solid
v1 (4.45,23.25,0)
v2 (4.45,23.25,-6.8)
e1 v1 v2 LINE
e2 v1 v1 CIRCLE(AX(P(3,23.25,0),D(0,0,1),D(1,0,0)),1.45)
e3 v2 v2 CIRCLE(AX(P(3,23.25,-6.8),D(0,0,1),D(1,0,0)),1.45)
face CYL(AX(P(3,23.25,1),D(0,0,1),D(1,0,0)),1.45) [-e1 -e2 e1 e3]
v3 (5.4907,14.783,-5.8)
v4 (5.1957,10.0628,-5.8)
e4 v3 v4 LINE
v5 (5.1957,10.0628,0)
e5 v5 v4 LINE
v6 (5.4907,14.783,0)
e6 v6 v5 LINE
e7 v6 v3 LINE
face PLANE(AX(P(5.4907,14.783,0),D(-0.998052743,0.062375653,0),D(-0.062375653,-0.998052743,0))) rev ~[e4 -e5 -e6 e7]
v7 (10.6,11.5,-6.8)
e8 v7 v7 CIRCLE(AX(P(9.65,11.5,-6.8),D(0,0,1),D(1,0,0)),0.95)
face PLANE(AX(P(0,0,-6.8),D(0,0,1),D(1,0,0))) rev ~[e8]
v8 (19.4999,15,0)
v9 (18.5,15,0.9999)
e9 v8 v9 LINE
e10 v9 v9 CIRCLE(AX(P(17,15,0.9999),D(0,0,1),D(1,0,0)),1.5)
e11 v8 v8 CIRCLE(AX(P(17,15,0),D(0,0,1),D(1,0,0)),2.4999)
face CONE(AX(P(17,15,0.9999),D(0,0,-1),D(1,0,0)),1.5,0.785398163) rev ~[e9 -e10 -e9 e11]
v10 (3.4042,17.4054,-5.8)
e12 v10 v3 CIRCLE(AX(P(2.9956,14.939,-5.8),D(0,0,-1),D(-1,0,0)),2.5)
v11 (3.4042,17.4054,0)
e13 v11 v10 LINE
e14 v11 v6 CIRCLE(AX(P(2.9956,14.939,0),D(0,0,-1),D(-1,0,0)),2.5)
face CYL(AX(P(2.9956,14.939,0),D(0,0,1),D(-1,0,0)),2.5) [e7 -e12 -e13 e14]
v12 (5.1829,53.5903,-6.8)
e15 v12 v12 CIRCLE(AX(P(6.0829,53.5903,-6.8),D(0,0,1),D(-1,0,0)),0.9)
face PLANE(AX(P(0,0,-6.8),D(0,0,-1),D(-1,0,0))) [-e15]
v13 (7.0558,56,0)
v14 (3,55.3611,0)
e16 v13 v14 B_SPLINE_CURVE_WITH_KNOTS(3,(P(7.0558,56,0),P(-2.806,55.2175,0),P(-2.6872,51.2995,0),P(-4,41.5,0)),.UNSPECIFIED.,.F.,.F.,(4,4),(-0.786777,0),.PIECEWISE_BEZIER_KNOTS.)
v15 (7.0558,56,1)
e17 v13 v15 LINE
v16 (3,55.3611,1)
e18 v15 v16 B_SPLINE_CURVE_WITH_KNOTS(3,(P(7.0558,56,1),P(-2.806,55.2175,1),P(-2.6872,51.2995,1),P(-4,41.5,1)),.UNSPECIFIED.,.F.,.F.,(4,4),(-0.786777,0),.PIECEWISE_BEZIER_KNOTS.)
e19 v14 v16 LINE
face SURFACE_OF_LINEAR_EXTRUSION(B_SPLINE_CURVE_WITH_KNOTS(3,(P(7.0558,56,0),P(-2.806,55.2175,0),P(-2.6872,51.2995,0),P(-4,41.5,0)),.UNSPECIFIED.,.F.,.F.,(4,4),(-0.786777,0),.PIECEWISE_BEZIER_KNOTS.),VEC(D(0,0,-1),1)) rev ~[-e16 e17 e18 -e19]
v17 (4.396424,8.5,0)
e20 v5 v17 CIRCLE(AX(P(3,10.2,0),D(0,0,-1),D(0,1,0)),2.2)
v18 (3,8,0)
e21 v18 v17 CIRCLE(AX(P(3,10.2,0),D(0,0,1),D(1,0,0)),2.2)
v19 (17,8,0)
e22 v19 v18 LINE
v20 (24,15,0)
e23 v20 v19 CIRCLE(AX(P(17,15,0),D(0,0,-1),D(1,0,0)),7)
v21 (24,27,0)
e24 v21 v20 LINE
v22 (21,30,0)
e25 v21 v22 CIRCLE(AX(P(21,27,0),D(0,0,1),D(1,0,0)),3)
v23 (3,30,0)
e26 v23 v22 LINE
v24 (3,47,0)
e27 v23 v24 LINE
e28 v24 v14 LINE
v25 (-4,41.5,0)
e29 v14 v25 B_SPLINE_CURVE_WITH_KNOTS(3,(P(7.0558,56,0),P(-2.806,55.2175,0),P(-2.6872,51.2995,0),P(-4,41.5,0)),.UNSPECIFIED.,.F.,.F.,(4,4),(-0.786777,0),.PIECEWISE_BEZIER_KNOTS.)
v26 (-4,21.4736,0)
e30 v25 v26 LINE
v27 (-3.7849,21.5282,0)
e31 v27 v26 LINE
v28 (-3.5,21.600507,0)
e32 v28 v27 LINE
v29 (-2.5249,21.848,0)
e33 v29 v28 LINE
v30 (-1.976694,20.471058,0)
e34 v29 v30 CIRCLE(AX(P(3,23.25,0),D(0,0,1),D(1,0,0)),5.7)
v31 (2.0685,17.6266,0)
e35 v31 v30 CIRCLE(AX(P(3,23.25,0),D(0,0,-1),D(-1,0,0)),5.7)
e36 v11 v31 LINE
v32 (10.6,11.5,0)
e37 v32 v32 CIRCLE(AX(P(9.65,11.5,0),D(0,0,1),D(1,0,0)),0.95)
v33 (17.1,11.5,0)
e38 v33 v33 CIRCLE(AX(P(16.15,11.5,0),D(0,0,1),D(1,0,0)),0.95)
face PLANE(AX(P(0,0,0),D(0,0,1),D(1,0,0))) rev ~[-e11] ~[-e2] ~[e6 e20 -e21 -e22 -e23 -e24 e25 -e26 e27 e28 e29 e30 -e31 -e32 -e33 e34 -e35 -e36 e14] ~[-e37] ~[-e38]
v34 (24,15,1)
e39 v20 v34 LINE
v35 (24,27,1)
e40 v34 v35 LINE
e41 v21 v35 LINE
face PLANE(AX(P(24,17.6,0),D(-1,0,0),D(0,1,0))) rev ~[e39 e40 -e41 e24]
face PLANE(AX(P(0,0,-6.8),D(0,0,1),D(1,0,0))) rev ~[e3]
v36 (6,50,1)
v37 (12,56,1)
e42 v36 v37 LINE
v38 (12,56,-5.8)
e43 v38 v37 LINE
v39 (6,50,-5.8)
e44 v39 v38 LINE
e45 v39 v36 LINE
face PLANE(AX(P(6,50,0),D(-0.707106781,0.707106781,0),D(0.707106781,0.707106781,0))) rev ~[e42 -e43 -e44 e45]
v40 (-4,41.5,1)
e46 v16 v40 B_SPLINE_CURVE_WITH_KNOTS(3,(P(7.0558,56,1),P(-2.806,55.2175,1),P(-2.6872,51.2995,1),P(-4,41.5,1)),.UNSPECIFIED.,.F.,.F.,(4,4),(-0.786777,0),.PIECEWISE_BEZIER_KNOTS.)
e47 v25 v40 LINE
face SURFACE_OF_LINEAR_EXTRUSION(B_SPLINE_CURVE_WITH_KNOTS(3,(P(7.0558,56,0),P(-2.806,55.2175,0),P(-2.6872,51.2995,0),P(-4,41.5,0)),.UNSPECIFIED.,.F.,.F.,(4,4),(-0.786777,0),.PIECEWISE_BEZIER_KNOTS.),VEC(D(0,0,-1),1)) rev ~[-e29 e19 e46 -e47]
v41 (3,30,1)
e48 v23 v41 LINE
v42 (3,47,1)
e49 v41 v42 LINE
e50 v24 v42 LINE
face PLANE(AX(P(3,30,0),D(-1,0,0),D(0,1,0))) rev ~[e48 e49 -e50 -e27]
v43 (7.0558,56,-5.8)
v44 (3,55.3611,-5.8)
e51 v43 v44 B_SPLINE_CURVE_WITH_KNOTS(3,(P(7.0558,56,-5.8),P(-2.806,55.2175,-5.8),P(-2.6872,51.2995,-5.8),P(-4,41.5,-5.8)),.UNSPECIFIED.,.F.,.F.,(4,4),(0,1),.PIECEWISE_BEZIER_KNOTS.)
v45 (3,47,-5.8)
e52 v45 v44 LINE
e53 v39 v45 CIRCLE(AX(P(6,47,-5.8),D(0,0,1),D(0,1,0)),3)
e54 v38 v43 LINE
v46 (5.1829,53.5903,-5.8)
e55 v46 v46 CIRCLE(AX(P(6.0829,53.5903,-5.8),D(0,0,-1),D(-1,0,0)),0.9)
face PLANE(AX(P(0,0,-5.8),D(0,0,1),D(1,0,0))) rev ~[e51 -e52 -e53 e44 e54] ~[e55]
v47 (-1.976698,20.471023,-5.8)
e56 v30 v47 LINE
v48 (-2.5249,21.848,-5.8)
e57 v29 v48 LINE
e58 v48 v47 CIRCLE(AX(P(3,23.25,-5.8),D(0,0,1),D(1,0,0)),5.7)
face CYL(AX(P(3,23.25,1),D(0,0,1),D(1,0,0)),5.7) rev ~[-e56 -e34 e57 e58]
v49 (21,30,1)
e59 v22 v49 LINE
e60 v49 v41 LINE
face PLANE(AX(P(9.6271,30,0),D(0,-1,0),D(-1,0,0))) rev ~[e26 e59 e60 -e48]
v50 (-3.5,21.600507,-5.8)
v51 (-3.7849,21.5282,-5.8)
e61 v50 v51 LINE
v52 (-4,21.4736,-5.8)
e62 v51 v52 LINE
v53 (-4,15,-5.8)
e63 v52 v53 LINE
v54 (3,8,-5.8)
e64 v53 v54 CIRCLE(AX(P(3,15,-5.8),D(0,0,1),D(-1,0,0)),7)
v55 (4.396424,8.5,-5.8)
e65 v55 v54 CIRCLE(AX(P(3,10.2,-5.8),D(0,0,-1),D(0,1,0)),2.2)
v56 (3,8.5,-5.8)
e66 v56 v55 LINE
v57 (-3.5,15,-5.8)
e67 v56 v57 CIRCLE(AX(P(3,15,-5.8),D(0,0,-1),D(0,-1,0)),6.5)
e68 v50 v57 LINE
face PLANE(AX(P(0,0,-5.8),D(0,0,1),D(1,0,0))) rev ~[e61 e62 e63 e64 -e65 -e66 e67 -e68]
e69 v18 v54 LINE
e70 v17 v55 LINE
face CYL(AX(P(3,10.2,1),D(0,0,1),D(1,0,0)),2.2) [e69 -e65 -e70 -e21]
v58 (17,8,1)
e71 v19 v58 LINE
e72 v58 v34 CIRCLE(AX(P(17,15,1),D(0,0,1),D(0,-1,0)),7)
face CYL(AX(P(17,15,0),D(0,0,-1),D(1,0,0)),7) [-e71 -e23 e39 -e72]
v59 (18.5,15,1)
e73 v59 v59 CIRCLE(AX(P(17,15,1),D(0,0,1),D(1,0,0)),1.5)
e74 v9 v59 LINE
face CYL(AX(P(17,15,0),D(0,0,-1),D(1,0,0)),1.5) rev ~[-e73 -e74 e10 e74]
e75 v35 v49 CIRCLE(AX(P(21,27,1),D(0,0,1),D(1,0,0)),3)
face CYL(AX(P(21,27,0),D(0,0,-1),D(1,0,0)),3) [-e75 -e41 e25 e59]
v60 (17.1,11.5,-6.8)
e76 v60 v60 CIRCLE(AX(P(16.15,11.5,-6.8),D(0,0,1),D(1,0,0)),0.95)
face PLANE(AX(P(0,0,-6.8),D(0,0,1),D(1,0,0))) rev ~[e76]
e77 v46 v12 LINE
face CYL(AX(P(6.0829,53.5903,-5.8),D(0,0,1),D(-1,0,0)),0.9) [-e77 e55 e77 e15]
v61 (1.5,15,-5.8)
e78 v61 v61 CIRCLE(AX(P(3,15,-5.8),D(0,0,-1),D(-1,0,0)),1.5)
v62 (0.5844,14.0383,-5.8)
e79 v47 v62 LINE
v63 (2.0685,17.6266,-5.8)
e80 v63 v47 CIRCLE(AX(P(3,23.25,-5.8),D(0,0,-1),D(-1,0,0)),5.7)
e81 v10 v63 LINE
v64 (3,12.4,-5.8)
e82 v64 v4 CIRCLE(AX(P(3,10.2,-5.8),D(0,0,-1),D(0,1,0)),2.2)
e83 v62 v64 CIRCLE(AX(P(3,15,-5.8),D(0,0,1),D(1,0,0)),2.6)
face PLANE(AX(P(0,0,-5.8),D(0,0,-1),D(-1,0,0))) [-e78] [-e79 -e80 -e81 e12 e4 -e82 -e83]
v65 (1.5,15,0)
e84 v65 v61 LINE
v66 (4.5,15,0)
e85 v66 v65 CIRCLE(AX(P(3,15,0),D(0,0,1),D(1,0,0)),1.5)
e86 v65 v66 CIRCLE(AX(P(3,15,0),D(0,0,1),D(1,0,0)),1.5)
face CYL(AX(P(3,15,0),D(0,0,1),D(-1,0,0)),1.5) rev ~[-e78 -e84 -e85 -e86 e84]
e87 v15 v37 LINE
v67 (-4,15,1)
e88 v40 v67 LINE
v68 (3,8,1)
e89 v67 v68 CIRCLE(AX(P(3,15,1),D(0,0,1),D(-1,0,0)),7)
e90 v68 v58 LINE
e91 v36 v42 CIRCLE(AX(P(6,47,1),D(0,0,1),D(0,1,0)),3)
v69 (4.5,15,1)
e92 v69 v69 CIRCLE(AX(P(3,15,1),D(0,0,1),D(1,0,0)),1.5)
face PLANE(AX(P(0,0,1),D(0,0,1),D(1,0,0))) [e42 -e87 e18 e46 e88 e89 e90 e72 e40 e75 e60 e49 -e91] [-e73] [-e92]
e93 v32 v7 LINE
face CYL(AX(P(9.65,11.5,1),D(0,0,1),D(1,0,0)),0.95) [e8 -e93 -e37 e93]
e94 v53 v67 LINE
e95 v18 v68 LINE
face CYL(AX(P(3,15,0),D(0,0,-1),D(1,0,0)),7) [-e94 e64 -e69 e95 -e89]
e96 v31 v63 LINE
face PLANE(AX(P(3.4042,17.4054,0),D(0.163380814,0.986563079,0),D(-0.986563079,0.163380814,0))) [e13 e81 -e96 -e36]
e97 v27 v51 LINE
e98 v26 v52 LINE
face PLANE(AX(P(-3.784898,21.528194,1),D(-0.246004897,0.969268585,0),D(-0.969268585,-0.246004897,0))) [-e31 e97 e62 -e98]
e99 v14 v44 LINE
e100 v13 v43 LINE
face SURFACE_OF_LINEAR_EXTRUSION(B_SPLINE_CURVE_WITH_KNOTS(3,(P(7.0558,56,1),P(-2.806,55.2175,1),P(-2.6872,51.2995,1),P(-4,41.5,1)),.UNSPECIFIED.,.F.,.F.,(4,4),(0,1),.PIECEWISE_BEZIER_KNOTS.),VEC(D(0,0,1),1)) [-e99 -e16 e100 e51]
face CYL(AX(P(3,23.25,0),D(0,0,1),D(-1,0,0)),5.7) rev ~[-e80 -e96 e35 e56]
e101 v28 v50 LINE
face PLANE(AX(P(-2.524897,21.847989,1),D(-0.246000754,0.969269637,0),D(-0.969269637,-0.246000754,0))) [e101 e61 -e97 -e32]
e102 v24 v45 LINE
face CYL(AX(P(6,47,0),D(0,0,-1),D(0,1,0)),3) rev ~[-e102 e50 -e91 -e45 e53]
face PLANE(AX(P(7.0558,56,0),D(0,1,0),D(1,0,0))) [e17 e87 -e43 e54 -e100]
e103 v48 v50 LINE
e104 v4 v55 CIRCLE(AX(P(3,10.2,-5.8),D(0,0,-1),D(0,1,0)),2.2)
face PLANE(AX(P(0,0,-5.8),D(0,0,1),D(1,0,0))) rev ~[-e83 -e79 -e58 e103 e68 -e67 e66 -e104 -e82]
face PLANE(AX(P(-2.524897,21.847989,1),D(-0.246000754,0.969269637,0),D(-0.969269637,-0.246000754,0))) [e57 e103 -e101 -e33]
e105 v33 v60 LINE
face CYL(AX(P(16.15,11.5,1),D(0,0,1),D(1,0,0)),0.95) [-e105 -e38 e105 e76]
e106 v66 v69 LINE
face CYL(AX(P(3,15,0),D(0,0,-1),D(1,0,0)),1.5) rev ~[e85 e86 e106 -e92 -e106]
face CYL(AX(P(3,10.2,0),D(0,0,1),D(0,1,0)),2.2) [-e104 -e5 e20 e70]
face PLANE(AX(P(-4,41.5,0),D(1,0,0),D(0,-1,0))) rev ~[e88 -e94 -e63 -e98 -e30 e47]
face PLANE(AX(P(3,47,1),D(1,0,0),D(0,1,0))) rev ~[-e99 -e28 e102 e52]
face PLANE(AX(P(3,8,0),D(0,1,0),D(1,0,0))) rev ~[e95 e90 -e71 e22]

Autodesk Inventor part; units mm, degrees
ref_plane "YZ Plane" through (0, 0, 0) normal (1, 0, 0) x (0, 1, 0)
sketch "Эскиз1" plane through (0, 0, 0) normal (0, 0, 1) x (1, 0, 0)
  line L0 (177.53, 10) -> (177.53, -9.022) projected
  line L1 (177.53, -9.022) -> (165.53, -9.022) projected
  line L2 (165.53, -9.022) -> (165.53, 10) projected
  line L3 (165.53, 10) -> (177.53, 10) projected
  line L4 (165.53, -76) -> (165.53, -56.978) projected
  line L5 (165.53, -56.978) -> (177.53, -56.978) projected
  line L6 (177.53, -56.978) -> (177.53, -76) projected
  line L7 (177.53, -76) -> (165.53, -76) projected
  circle A0 centre (170.53, -49.23) radius 1.6 projected
  circle A1 centre (170.53, -16.77) radius 1.6 projected
  line L8 (181.53, -107.5) -> (181.53, 41.5) projected
  spline S0 degree 3 poles (170.4742, 56) (180.336, 55.2175) (180.2172, 51.2995) (181.53, 41.5) knots -0.786777 -0.786777 -0.786777 -0.786777 0 0 0 0 projected
  line L9 (7.0558, 56) -> (170.4742, 56) projected
  spline S1 degree 3 poles (7.0558, 56) (-2.806, 55.2175) (-2.6872, 51.2995) (-4, 41.5) knots -0.786777 -0.786777 -0.786777 -0.786777 0 0 0 0 projected
  line L10 (-4, 41.5) -> (-4, -107.5) projected
  spline S2 degree 3 poles (7.0558, -122) (-2.806, -121.2175) (-2.6872, -117.2995) (-4, -107.5) knots -0.786777 -0.786777 -0.786777 -0.786777 0 0 0 0 projected
  line L11 (170.4742, -122) -> (7.0558, -122) projected
  spline S3 degree 3 poles (170.4742, -122) (180.336, -121.2175) (180.2172, -117.2995) (181.53, -107.5) knots -0.786777 -0.786777 -0.786777 -0.786777 0 0 0 0 projected
  arc A2 (153.53, -93) -> (156.53, -96) centre (156.53, -93) ccw projected
  line L12 (156.53, -96) -> (174.53, -96) projected
  line L13 (174.53, -96) -> (174.53, -113) projected
  arc A3 (171.53, -116) -> (174.53, -113) centre (171.53, -113) ccw projected
  line L14 (171.53, -116) -> (6, -116) projected
  arc A4 (3, -113) -> (6, -116) centre (6, -113) ccw projected
  line L15 (3, -113) -> (3, -96) projected
  line L16 (3, -96) -> (21, -96) projected
  arc A5 (21, -96) -> (24, -93) centre (21, -93) ccw projected
  line L17 (24, -93) -> (24, 27) projected
  arc A6 (24, 27) -> (21, 30) centre (21, 27) ccw projected
  line L18 (21, 30) -> (3, 30) projected
  line L19 (3, 30) -> (3, 47) projected
  arc A7 (6, 50) -> (3, 47) centre (6, 47) ccw projected
  line L20 (6, 50) -> (171.53, 50) projected
  arc A8 (174.53, 47) -> (171.53, 50) centre (171.53, 47) ccw projected
  line L21 (174.53, 30) -> (174.53, 47) projected
  line L22 (174.53, 30) -> (156.53, 30) projected
  arc A9 (156.53, 30) -> (153.53, 27) centre (156.53, 27) ccw projected
  line L23 (153.53, 27) -> (153.53, -93) projected
  circle A10 centre (160.53, -81) radius 1.5 projected
  circle A11 centre (17, -81) radius 1.5 projected
  circle A12 centre (17, -51) radius 1.5 projected
  circle A13 centre (160.53, -51) radius 1.5 projected
  circle A14 centre (3, -81) radius 1.5 projected
  circle A15 centre (3, -51) radius 1.5 projected
  circle A16 centre (174.53, -81) radius 1.5 projected
  circle A17 centre (17, 15) radius 1.5 projected
  circle A18 centre (17, -15) radius 1.5 projected
  circle A19 centre (160.53, -15) radius 1.5 projected
  circle A20 centre (160.53, 15) radius 1.5 projected
  circle A21 centre (3, 15) radius 1.5 projected
  circle A22 centre (174.53, 15) radius 1.5 projected
  circle A23 centre (3, -15) radius 1.5 projected
  arc A24 (56.8183, -29.5099) -> (58.485, -27.5378) centre (56.485, -27.5378) ccw projected
  line L24 (58.485, -27.5378) -> (58.485, 14) projected
  arc A25 (61.485, 17) -> (58.485, 14) centre (61.485, 14) ccw projected
  line L25 (61.485, 17) -> (61.97, 17) projected
  arc A26 (61.97, 17) -> (64.97, 20) centre (61.97, 20) ccw projected
  line L26 (64.97, 27) -> (64.97, 20) projected
  arc A27 (64.97, 27) -> (61.97, 30) centre (61.97, 27) ccw projected
  line L27 (9.6271, 30) -> (61.97, 30) projected
  arc A28 (9.6271, 30) -> (-1.03, 20.7602) centre (9.8286, 19.0018) ccw projected
  line L28 (-1.03, 20.7602) -> (-1.03, 11.499) projected
  arc A29 (-1.03, 11.499) -> (0.1129, 8.6996) centre (2.97, 11.499) ccw projected
  arc A30 (0.97, 6.6) -> (0.1129, 8.6996) centre (-2.03, 6.6) ccw projected
  line L29 (0.97, 6.6) -> (0.97, -72.6) projected
  arc A31 (0.1129, -74.6996) -> (0.97, -72.6) centre (-2.03, -72.6) ccw projected
  arc A32 (0.1129, -74.6996) -> (-1.03, -77.499) centre (2.97, -77.499) ccw projected
  line L30 (-1.03, -77.499) -> (-1.03, -86.7602) projected
  arc A33 (-1.03, -86.7602) -> (9.6271, -96) centre (9.8286, -85.0018) ccw projected
  line L31 (61.97, -96) -> (9.6271, -96) projected
  arc A34 (61.97, -96) -> (64.97, -93) centre (61.97, -93) ccw projected
  line L32 (64.97, -86) -> (64.97, -93) projected
  arc A35 (64.97, -86) -> (61.97, -83) centre (61.97, -86) ccw projected
  line L33 (61.97, -83) -> (61.485, -83) projected
  arc A36 (58.485, -80) -> (61.485, -83) centre (61.485, -80) ccw projected
  line L34 (58.485, -80) -> (58.485, -48.5022) projected
  arc A37 (58.485, -48.5022) -> (56.8183, -46.5301) centre (56.485, -48.5022) ccw projected
  arc A38 (53.485, -45.3303) -> (56.8183, -46.5301) centre (58.485, -36.67) ccw projected
  arc A39 (52.485, -43.5982) -> (53.485, -45.3303) centre (54.485, -43.5982) ccw projected
  line L35 (52.485, -43.5982) -> (52.485, -32.4418) projected
  arc A40 (53.485, -30.7097) -> (52.485, -32.4418) centre (54.485, -32.4418) ccw projected
  arc A41 (56.8183, -29.5099) -> (53.485, -30.7097) centre (58.485, -39.37) ccw projected
  circle A42 centre (3, -81) radius 1.5 projected
  circle A43 centre (3, 15) radius 1.5 projected
  circle A44 centre (58.485, -89.515) radius 1.5 projected
  circle A45 centre (17, -51) radius 1.5 projected
  circle A46 centre (17, -15) radius 1.5 projected
  circle A47 centre (58.485, 23.515) radius 1.5 projected
  circle A48 centre (49.485, 22.73) radius 0.325 projected
  circle A49 centre (48.885, -25.77) radius 0.8 projected
  circle A50 centre (49.385, -32.52) radius 0.5 projected
  circle A51 centre (4.27, -36.27) radius 0.325 projected
  circle A52 centre (28.2, -73.38) radius 0.325 projected
  circle A53 centre (12.77, 15) radius 0.325 projected
  circle A54 centre (55.185, -49.79) radius 0.325 projected
  circle A55 centre (55.185, -4.51) radius 0.325 projected
  circle A56 centre (12.77, 22) radius 0.325 projected
  circle A57 centre (12.77, -88) radius 0.325 projected
  circle A58 centre (4.27, -23.42) radius 0.325 projected
  circle A59 centre (39.385, -40.52) radius 0.85 projected
  circle A60 centre (53.885, -25.77) radius 0.8 projected
  circle A61 centre (8.77, -88) radius 0.325 projected
  circle A62 centre (39.385, -35.52) radius 0.85 projected
  circle A63 centre (28.2, -60.76) radius 0.325 projected
  circle A64 centre (4.27, -47) radius 0.325 projected
  circle A65 centre (45.215, -90) radius 0.325 projected
  circle A66 centre (43.485, 24.73) radius 0.5 projected
  circle A67 centre (55.185, -69.03) radius 0.325 projected
  circle A68 centre (55.185, 15.73) radius 0.325 projected
  circle A69 centre (45.215, -83) radius 0.325 projected
  circle A70 centre (12.77, -81) radius 0.325 projected
  circle A71 centre (4.27, -8.84) radius 0.325 projected
  circle A72 centre (49.385, -43.52) radius 0.5 projected
  circle A73 centre (8.77, 22) radius 0.325 projected
  line L36 (6, 50) -> (12, 56)
  line L37 (3, 47) -> (3, 55.3611)
  circle A74 centre (3, 15) radius 7
  circle A75 centre (17, 15) radius 7
  line L38 (3, 8) -> (17, 8)
  circle A76 centre (3, 15) radius 2.6
  line L39 (3, 17.6) -> (24, 17.6)
  line L40 (5.6, 15) -> (7.6, 15)
  line L41 (7.6, 15) -> (7.6, 17.6)
  line L42 (7.6, 15) -> (7.6, 8)
  line L43 (7.6, 17.6) -> (20.4, 17.6)
  line L44 (20.4, 17.6) -> (20.4, 7.6)
  line L45 (20.4, 7.6) -> (7.6, 7.6)
  line L46 (7.6, 7.6) -> (7.6, 17.6)
  point P0 (0, 0)
  point P1 (23.4992, 17.6)
  point P2 (-4, 15)
  point P3 (10.5008, 17.6)
  point P4 (10, 15)
  point P5 (9.4992, 17.6)
  point P6 (24, 15)
  dimension "d8" = 5.2
  dimension "d15" = 2
  dimension "d16" = 12.8
  dimension "d17" = 10
extrude "Выдавливание1" add sketch "Эскиз1" along normal blind 1 contours L36 A7 L37 S1 L9 | L10 S1 L37 L19 L18 A28 L28 A74 | A74 L28 A29 A30 | A74 L39 A76 L40 L42 A30 A29 L28 | L28 A28 L18 A6 L17 L39 A75 A74 | L39 A75 A74 | A74 L42 L41 L39 | A74 L42 L38 | A75 L38 L42 A74 | A75 L39 L44 | L41 L40 A76 L39 | A75 L39 | A76 | L39 L17 A75 | A75 L44 L39 | A53 | A56 | A73
chamfer "Фаска1" distance 1 angle 45 1 edges at (15.5, 15, 0)
sketch "Эскиз2" plane through (0, 0, 1) normal (0, 0, 1) x (1, 0, 0)
  circle A0 centre (3, 15) radius 1.5 projected
  line L0 (24, 15) -> (24, 27) projected
  arc A1 (24, 27) -> (21, 30) centre (21, 27) ccw projected
  line L1 (21, 30) -> (3, 30) projected
  line L2 (3, 30) -> (3, 47) projected
  arc A2 (6, 50) -> (3, 47) centre (6, 47) ccw projected
  line L3 (6, 50) -> (12, 56) projected
  line L4 (12, 56) -> (7.0558, 56) projected
  line L5 (-4, 41.5) -> (-4, 15) projected
  arc A3 (-4, 15) -> (3, 8) centre (3, 15) ccw projected
  line L6 (3, 8) -> (17, 8) projected
  arc A4 (17, 8) -> (24, 15) centre (17, 15) ccw projected
  line L7 (3, 30) -> (3, 47) projected
  line L8 (3, 47) -> (3, 55.3611)
  arc A5 (6, 50) -> (3, 47) centre (6, 47) ccw projected
  circle A6 centre (3, 15) radius 1.5 projected
  line L9 (4.5, 15) -> (6.5, 15)
  line L10 (6.5, 15) -> (6.5, 16.5)
  line L11 (6.5, 16.5) -> (3, 16.5)
  line L12 (21, 30) -> (3, 30) projected
  line L13 (3, 16.5) -> (3, 30)
  circle A7 centre (3, 23.25) radius 1.6
  line L14 (6.5, 16.5) -> (19.3, 16.5)
  line L15 (19.3, 16.5) -> (19.3, 6.4)
  line L16 (19.3, 6.4) -> (6.5, 6.4)
  line L17 (6.5, 6.4) -> (6.5, 16.5)
  line L18 (19.3, 16.5) -> (19.3, 10)
  line L19 (19.3, 10) -> (19.3, 11.5)
  line L20 (19.3, 11.5) -> (6.5, 11.5)
  line L21 (12.9, 11.5) -> (16.15, 11.5)
  line L22 (16.15, 11.5) -> (9.65, 11.5)
  circle A8 centre (9.65, 11.5) radius 1
  circle A9 centre (16.15, 11.5) radius 1
  line L23 (19.3, 10) -> (6.5, 10)
  line L24 (9.65, 11.5) -> (18.15, 11.5)
  line L25 (18.172, 17.2) -> (6.5, 16.5)
  line L26 (17.4875, 20.5) -> (6.5, 16.5)
  arc A10 (18.1929, 16.5) -> (17.4875, 20.5) centre (6.5, 16.5) ccw
  line L27 (6.5, 16.5) -> (6.5, 16.7)
  line L28 (8.0036, 17.7621) -> (19.1448, 21.3116)
  circle A11 centre (3, 15) radius 2.6
  circle A12 centre (3, 23.25) radius 5.5
  line L29 (8.0036, 17.7621) -> (5.1102, 17.8522)
  line L30 (2.8349, 17.7525) -> (3.7176, 17.499)
  circle A13 centre (3, 23.25) radius 16.2607
  line L31 (6.5, 16.7) -> (18.172, 17.4)
  line L32 (6.5, 16.7) -> (3.7176, 17.499)
  line L33 (4.1923, 17.8808) -> (5.1102, 17.8522)
  line L34 (17.7935, 30) -> (3, 23.25)
  line L35 (3, 23.25) -> (18.9993, 26.1538)
  line L36 (21, 30) -> (3, 30) projected
  line L37 (18.9993, 26.1538) -> (8.3735, 28.8503)
  line L38 (18.9993, 26.1538) -> (3.8431, 30)
  circle A14 centre (3, 23.25) radius 6.75
  point P0 (0, 0)
  dimension "d41" = 11
  dimension "d23" = 2
  dimension "d24" = 3.2
  dimension "d25" = 12.8
  dimension "d26" = 10.1
  dimension "d27" = 6.5
  dimension "d28" = 1.5
  dimension "d29" = 3.25
  dimension "d30" = 6.5
  dimension "d31" = 2
  dimension "d32" = 2
  dimension "d35" = 8.5
  dimension "d39" = 0.2
  dimension "d40" = 5.2
  dimension "d42" = 16.572
  dimension "d44" = 14.239
  dimension "d45" = 24.526
  dimension "d48" = 24.526
sketch "Эскиз3" plane through (0, 0, 1) normal (0, 0, 1) x (1, 0, 0)
  arc A0 (-2.5, 23.25) -> (3, 17.75) centre (3, 23.25) ccw projected
  line L0 (3, 17.75) -> (3, 17.7051) projected
  line L1 (3, 17.7051) -> (6.5, 16.7) projected
  line L2 (6.5, 16.7) -> (18.172, 17.4) projected
  arc A1 (18.172, 17.4) -> (18.9993, 26.1538) centre (3, 23.25) ccw projected
  line L3 (18.9993, 26.1538) -> (4.6603, 29.7926) projected
  arc A2 (4.6603, 29.7926) -> (3, 30) centre (3, 23.25) ccw projected
  line L4 (3, 30) -> (3, 55.3611) projected
  spline S0 degree 3 poles (3, 55.3611) (-2.8051, 53.7936) (-2.8999, 49.7118) (-4, 41.5) knots -0.659309 -0.659309 -0.659309 -0.659309 0 0 0 0 projected
  line L5 (-4, 41.5) -> (-4, 23.25) projected
  line L6 (-4, 23.25) -> (-2.5, 23.25) projected
  circle A3 centre (3, 23.25) radius 1.6 projected
  line L7 (-2.331, 21.8972) -> (-3.7849, 21.5282)
  line L8 (-4, 41.5) -> (-4, 15) projected
  line L9 (-2.331, 21.8972) -> (-4, 21.4736)
  line L10 (-2.331, 21.8972) -> (-2.5249, 21.848)
  circle A4 centre (3, 23.25) radius 5.7
  circle A5 centre (3, 15) radius 2.6 projected
  line L11 (-2.5249, 21.848) -> (0.5844, 14.0383)
  arc A6 (-4, 15) -> (3, 8) centre (3, 15) ccw projected
  line L12 (3, 12.4) -> (3, 8)
  circle A7 centre (3, 10.2) radius 2.2
  line L13 (3, 30) -> (3, 55.3611) projected
  circle A8 centre (3, 15) radius 1.5 projected
  line L14 (24, 15) -> (24, 27) projected
  arc A9 (24, 27) -> (21, 30) centre (21, 27) ccw projected
  line L15 (21, 30) -> (3, 30) projected
  line L16 (3, 30) -> (3, 47) projected
  arc A10 (6, 50) -> (3, 47) centre (6, 47) ccw projected
  line L17 (6, 50) -> (12, 56) projected
  line L18 (12, 56) -> (7.0558, 56) projected
  spline S1 degree 3 poles (7.0558, 56) (-2.806, 55.2175) (-2.6872, 51.2995) (-4, 41.5) knots 0 0 0 0 1 1 1 1 projected
  line L19 (-4, 41.5) -> (-4, 15) projected
  arc A11 (-4, 15) -> (3, 8) centre (3, 15) ccw projected
  line L20 (3, 8) -> (17, 8) projected
  arc A12 (17, 8) -> (24, 15) centre (17, 15) ccw projected
  point P0 (0, 0)
  point P1 (-1.9767, 20.471)
  point P2 (-2.7, 23.25)
  point P3 (3, 8)
  dimension "d49" = 0.2
extrude "Выдавливание2" add sketch "Эскиз3" against normal blind 6.8 contours A4 L11 A5 A7 A6 L8 L9 L7 | S1 L18 L17 A10 L4 | A7 L12 | L12 A7
ref_plane "РабПлоскость3" through (-3.5074, 8.5, -6.8) normal (0, 0, -1) x (0, 1, 0)
sketch "Эскиз4" plane through (0, 0, 1) normal (0, 0, 1) x (1, 0, 0)
  line L0 (3, 8) -> (17, 8) projected
  arc A0 (17, 8) -> (24, 15) centre (17, 15) ccw projected
  line L1 (24, 15) -> (24, 27) projected
  arc A1 (24, 27) -> (21, 30) centre (21, 27) ccw projected
  line L2 (21, 30) -> (3, 30) projected
  line L3 (3, 30) -> (3, 47) projected
  line L4 (-4, 41.5) -> (-4, 15) projected
  circle A2 centre (3, 15) radius 1.5 projected
  circle A3 centre (3, 23.25) radius 1.6 projected
  circle A4 centre (3, 23.25) radius 1.6
  arc A5 (-4, 15) -> (3, 8) centre (3, 15) ccw projected
  arc A6 (6, 50) -> (3, 47) centre (6, 47) ccw projected
  line L5 (6, 50) -> (12, 56) projected
  line L6 (12, 56) -> (7.0558, 56) projected
  circle A7 centre (3, 23.25) radius 1.45
  point P0 (0, 0)
  dimension "d59" = 2.9
extrude "Выдавливание3" add sketch "Эскиз4" against normal up to surface (7.8 mm away) contours A7
ref_plane "РабПлоскость1" through (10, -98, 1) normal (0, 0, 1) x (-1, 0, 0)
sketch "Эскиз5" plane through (0, 0, 1) normal (0, 0, 1) x (1, 0, 0)
  circle A0 centre (16.15, 11.5) radius 1 projected
  circle A1 centre (9.65, 11.5) radius 1 projected
  circle A2 centre (16.15, 11.5) radius 0.95
  circle A3 centre (9.65, 11.5) radius 0.95
  point P0 (0, 0)
  dimension "d55" = 1.9
  dimension "d56" = 1.9
ref_plane "РабПлоскость2" through (-3.5074, 8.5, -6.8) normal (0, 0, -1) x (0, 1, 0)
extrude "Выдавливание4" add sketch "Эскиз5" against normal up to surface (7.8 mm away) contours A2 | A3
sketch "Эскиз6" plane through (0, 0, -5.8) normal (0, 0, -1) x (-1, 0, 0)
  line L0 (-3, 55.3611) -> (-3, 47) projected
  line L1 (-3, 47) -> (-3, 55.3611)
  line L2 (-3, 51.1805) -> (-9.1658, 56)
  line L3 (-7.0558, 56) -> (-12, 56) projected
  circle A0 centre (-6.0829, 53.5903) radius 0.9
  point P0 (0, 0)
  point P1 (-3, 48.8974)
  point P2 (-11.2757, 56)
  dimension "d60" = 1.8
extrude "Выдавливание5" add sketch "Эскиз6" along normal blind 1
sketch "Эскиз7" plane through (0, 0, 0) normal (0, 0, -1) x (-1, 0, 0)
  circle A0 centre (-3, 23.25) radius 1.45 projected
  arc A1 (1.9767, 20.471) -> (2.5249, 21.848) centre (-3, 23.25) ccw projected
  circle A2 centre (-3, 23.25) radius 5.7
  circle A3 centre (-2.9956, 14.939) radius 2.5
  circle A4 centre (-6.0829, 53.5903) radius 1 projected
  circle A5 centre (-9.65, 11.5) radius 1 projected
  circle A6 centre (-16.15, 11.5) radius 1 projected
  circle A7 centre (-3, 15) radius 1.5 projected
  spline S0 degree 3 poles (-11.8813, 55.8813) (-11.5826, 55.8576) (-11.2839, 55.8339) (-9.6886, 55.7073) (-8.392, 55.6044) (-7.0954, 55.5016) (-6.4276, 55.4486) (-5.761, 55.378) (-4.436, 55.18) (-3.7771, 55.053) (-3.1303, 54.8784) knots -0.480098 -0.480098 -0.480098 -0.480098 -0.390203 -0.390203 0 0 0 0.200965 0.200965 0.401929 0.401929 0.401929 0.401929 projected
  line L0 (-6, 50) -> (-11.8813, 55.8813) projected
  arc A8 (-3, 47) -> (-6, 50) centre (-6, 47) ccw projected
  line L1 (-3, 29.5) -> (-3, 47) projected
  line L2 (-21, 29.5) -> (-3, 29.5) projected
  arc A9 (-21, 29.5) -> (-23.5, 27) centre (-21, 27) ccw projected
  line L3 (-23.5, 15) -> (-23.5, 27) projected
  arc A10 (-23.5, 15) -> (-17, 8.5) centre (-17, 15) ccw projected
  line L4 (-3, 8.5) -> (-17, 8.5) projected
  arc A11 (-3, 8.5) -> (3.5, 15) centre (-3, 15) ccw projected
  line L5 (3.5, 41.4667) -> (3.5, 15) projected
  spline S1 degree 3 poles (-3.1303, 54.8784) (-2.6291, 54.743) (-2.1362, 54.5792) (-0.9005, 54.0408) (-0.1868, 53.5905) (0.8903, 52.4892) (1.2826, 51.883) (1.8703, 50.6272) (2.0813, 49.9831) (2.4991, 48.4014) (2.6686, 47.4532) (2.9735, 45.5011) (3.1042, 44.4955) (3.3227, 42.8153) (3.4098, 42.1408) (3.5, 41.4667) knots 0 0 0 0 0.155758 0.155758 0.404215 0.404215 0.617746 0.617746 0.82024 0.82024 1.108518 1.108518 1.413208 1.413208 1.61725 1.61725 1.61725 1.61725 projected
  circle A12 centre (-3, 23.25) radius 1.6 projected
  arc A13 (-3, 12.4) -> (-3, 8) centre (-3, 10.2) ccw projected
  line L6 (1.9767, 20.471) -> (-0.5844, 14.0383) projected
  line L7 (4, 21.4736) -> (2.5249, 21.848) projected
  circle A14 centre (-6.0829, 53.5903) radius 1 projected
  circle A15 centre (-9.65, 11.5) radius 1 projected
  circle A16 centre (-16.15, 11.5) radius 1 projected
  circle A17 centre (-3, 15) radius 1.5 projected
  spline S2 degree 3 poles (-11.8813, 55.8813) (-11.5826, 55.8576) (-11.2839, 55.8339) (-9.6886, 55.7073) (-8.392, 55.6044) (-7.0954, 55.5016) (-6.4276, 55.4486) (-5.761, 55.378) (-4.436, 55.18) (-3.7771, 55.053) (-3.1303, 54.8784) knots -0.480098 -0.480098 -0.480098 -0.480098 -0.390203 -0.390203 0 0 0 0.200965 0.200965 0.401929 0.401929 0.401929 0.401929 projected
  line L8 (-6, 50) -> (-11.8813, 55.8813) projected
  arc A18 (-3, 47) -> (-6, 50) centre (-6, 47) ccw projected
  line L9 (-3, 29.5) -> (-3, 47) projected
  line L10 (-21, 29.5) -> (-3, 29.5) projected
  arc A19 (-21, 29.5) -> (-23.5, 27) centre (-21, 27) ccw projected
  line L11 (-23.5, 15) -> (-23.5, 27) projected
  arc A20 (-23.5, 15) -> (-17, 8.5) centre (-17, 15) ccw projected
  line L12 (-3, 8.5) -> (-17, 8.5) projected
  arc A21 (-3, 8.5) -> (3.5, 15) centre (-3, 15) ccw projected
  line L13 (3.5, 41.4667) -> (3.5, 15) projected
  spline S3 degree 3 poles (-3.1303, 54.8784) (-2.6291, 54.743) (-2.1362, 54.5792) (-0.9005, 54.0408) (-0.1868, 53.5905) (0.8903, 52.4892) (1.2826, 51.883) (1.8703, 50.6272) (2.0813, 49.9831) (2.4991, 48.4014) (2.6686, 47.4532) (2.9735, 45.5011) (3.1042, 44.4955) (3.3227, 42.8153) (3.4098, 42.1408) (3.5, 41.4667) knots 0 0 0 0 0.155758 0.155758 0.404215 0.404215 0.617746 0.617746 0.82024 0.82024 1.108518 1.108518 1.413208 1.413208 1.61725 1.61725 1.61725 1.61725 projected
  circle A22 centre (-3, 23.25) radius 1.6 projected
  line L14 (-5.4907, 14.783) -> (-5.1957, 10.0628)
  arc A23 (-3, 12.4) -> (-3, 8) centre (-3, 10.2) ccw projected
  line L15 (-3.4042, 17.4054) -> (-2.0685, 17.6266)
  point P0 (0, 0)
  point P1 (-4.3964, 8.5)
  point P2 (3.5, 21.6005)
  dimension "d63" = 5
extrude "Выдавливание6" add sketch "Эскиз7" along normal blind 5.8 contours A1 L7 L5 A11 L4 A13 L14 A3 L15 A2 | A3
properties part number "end carp right"
